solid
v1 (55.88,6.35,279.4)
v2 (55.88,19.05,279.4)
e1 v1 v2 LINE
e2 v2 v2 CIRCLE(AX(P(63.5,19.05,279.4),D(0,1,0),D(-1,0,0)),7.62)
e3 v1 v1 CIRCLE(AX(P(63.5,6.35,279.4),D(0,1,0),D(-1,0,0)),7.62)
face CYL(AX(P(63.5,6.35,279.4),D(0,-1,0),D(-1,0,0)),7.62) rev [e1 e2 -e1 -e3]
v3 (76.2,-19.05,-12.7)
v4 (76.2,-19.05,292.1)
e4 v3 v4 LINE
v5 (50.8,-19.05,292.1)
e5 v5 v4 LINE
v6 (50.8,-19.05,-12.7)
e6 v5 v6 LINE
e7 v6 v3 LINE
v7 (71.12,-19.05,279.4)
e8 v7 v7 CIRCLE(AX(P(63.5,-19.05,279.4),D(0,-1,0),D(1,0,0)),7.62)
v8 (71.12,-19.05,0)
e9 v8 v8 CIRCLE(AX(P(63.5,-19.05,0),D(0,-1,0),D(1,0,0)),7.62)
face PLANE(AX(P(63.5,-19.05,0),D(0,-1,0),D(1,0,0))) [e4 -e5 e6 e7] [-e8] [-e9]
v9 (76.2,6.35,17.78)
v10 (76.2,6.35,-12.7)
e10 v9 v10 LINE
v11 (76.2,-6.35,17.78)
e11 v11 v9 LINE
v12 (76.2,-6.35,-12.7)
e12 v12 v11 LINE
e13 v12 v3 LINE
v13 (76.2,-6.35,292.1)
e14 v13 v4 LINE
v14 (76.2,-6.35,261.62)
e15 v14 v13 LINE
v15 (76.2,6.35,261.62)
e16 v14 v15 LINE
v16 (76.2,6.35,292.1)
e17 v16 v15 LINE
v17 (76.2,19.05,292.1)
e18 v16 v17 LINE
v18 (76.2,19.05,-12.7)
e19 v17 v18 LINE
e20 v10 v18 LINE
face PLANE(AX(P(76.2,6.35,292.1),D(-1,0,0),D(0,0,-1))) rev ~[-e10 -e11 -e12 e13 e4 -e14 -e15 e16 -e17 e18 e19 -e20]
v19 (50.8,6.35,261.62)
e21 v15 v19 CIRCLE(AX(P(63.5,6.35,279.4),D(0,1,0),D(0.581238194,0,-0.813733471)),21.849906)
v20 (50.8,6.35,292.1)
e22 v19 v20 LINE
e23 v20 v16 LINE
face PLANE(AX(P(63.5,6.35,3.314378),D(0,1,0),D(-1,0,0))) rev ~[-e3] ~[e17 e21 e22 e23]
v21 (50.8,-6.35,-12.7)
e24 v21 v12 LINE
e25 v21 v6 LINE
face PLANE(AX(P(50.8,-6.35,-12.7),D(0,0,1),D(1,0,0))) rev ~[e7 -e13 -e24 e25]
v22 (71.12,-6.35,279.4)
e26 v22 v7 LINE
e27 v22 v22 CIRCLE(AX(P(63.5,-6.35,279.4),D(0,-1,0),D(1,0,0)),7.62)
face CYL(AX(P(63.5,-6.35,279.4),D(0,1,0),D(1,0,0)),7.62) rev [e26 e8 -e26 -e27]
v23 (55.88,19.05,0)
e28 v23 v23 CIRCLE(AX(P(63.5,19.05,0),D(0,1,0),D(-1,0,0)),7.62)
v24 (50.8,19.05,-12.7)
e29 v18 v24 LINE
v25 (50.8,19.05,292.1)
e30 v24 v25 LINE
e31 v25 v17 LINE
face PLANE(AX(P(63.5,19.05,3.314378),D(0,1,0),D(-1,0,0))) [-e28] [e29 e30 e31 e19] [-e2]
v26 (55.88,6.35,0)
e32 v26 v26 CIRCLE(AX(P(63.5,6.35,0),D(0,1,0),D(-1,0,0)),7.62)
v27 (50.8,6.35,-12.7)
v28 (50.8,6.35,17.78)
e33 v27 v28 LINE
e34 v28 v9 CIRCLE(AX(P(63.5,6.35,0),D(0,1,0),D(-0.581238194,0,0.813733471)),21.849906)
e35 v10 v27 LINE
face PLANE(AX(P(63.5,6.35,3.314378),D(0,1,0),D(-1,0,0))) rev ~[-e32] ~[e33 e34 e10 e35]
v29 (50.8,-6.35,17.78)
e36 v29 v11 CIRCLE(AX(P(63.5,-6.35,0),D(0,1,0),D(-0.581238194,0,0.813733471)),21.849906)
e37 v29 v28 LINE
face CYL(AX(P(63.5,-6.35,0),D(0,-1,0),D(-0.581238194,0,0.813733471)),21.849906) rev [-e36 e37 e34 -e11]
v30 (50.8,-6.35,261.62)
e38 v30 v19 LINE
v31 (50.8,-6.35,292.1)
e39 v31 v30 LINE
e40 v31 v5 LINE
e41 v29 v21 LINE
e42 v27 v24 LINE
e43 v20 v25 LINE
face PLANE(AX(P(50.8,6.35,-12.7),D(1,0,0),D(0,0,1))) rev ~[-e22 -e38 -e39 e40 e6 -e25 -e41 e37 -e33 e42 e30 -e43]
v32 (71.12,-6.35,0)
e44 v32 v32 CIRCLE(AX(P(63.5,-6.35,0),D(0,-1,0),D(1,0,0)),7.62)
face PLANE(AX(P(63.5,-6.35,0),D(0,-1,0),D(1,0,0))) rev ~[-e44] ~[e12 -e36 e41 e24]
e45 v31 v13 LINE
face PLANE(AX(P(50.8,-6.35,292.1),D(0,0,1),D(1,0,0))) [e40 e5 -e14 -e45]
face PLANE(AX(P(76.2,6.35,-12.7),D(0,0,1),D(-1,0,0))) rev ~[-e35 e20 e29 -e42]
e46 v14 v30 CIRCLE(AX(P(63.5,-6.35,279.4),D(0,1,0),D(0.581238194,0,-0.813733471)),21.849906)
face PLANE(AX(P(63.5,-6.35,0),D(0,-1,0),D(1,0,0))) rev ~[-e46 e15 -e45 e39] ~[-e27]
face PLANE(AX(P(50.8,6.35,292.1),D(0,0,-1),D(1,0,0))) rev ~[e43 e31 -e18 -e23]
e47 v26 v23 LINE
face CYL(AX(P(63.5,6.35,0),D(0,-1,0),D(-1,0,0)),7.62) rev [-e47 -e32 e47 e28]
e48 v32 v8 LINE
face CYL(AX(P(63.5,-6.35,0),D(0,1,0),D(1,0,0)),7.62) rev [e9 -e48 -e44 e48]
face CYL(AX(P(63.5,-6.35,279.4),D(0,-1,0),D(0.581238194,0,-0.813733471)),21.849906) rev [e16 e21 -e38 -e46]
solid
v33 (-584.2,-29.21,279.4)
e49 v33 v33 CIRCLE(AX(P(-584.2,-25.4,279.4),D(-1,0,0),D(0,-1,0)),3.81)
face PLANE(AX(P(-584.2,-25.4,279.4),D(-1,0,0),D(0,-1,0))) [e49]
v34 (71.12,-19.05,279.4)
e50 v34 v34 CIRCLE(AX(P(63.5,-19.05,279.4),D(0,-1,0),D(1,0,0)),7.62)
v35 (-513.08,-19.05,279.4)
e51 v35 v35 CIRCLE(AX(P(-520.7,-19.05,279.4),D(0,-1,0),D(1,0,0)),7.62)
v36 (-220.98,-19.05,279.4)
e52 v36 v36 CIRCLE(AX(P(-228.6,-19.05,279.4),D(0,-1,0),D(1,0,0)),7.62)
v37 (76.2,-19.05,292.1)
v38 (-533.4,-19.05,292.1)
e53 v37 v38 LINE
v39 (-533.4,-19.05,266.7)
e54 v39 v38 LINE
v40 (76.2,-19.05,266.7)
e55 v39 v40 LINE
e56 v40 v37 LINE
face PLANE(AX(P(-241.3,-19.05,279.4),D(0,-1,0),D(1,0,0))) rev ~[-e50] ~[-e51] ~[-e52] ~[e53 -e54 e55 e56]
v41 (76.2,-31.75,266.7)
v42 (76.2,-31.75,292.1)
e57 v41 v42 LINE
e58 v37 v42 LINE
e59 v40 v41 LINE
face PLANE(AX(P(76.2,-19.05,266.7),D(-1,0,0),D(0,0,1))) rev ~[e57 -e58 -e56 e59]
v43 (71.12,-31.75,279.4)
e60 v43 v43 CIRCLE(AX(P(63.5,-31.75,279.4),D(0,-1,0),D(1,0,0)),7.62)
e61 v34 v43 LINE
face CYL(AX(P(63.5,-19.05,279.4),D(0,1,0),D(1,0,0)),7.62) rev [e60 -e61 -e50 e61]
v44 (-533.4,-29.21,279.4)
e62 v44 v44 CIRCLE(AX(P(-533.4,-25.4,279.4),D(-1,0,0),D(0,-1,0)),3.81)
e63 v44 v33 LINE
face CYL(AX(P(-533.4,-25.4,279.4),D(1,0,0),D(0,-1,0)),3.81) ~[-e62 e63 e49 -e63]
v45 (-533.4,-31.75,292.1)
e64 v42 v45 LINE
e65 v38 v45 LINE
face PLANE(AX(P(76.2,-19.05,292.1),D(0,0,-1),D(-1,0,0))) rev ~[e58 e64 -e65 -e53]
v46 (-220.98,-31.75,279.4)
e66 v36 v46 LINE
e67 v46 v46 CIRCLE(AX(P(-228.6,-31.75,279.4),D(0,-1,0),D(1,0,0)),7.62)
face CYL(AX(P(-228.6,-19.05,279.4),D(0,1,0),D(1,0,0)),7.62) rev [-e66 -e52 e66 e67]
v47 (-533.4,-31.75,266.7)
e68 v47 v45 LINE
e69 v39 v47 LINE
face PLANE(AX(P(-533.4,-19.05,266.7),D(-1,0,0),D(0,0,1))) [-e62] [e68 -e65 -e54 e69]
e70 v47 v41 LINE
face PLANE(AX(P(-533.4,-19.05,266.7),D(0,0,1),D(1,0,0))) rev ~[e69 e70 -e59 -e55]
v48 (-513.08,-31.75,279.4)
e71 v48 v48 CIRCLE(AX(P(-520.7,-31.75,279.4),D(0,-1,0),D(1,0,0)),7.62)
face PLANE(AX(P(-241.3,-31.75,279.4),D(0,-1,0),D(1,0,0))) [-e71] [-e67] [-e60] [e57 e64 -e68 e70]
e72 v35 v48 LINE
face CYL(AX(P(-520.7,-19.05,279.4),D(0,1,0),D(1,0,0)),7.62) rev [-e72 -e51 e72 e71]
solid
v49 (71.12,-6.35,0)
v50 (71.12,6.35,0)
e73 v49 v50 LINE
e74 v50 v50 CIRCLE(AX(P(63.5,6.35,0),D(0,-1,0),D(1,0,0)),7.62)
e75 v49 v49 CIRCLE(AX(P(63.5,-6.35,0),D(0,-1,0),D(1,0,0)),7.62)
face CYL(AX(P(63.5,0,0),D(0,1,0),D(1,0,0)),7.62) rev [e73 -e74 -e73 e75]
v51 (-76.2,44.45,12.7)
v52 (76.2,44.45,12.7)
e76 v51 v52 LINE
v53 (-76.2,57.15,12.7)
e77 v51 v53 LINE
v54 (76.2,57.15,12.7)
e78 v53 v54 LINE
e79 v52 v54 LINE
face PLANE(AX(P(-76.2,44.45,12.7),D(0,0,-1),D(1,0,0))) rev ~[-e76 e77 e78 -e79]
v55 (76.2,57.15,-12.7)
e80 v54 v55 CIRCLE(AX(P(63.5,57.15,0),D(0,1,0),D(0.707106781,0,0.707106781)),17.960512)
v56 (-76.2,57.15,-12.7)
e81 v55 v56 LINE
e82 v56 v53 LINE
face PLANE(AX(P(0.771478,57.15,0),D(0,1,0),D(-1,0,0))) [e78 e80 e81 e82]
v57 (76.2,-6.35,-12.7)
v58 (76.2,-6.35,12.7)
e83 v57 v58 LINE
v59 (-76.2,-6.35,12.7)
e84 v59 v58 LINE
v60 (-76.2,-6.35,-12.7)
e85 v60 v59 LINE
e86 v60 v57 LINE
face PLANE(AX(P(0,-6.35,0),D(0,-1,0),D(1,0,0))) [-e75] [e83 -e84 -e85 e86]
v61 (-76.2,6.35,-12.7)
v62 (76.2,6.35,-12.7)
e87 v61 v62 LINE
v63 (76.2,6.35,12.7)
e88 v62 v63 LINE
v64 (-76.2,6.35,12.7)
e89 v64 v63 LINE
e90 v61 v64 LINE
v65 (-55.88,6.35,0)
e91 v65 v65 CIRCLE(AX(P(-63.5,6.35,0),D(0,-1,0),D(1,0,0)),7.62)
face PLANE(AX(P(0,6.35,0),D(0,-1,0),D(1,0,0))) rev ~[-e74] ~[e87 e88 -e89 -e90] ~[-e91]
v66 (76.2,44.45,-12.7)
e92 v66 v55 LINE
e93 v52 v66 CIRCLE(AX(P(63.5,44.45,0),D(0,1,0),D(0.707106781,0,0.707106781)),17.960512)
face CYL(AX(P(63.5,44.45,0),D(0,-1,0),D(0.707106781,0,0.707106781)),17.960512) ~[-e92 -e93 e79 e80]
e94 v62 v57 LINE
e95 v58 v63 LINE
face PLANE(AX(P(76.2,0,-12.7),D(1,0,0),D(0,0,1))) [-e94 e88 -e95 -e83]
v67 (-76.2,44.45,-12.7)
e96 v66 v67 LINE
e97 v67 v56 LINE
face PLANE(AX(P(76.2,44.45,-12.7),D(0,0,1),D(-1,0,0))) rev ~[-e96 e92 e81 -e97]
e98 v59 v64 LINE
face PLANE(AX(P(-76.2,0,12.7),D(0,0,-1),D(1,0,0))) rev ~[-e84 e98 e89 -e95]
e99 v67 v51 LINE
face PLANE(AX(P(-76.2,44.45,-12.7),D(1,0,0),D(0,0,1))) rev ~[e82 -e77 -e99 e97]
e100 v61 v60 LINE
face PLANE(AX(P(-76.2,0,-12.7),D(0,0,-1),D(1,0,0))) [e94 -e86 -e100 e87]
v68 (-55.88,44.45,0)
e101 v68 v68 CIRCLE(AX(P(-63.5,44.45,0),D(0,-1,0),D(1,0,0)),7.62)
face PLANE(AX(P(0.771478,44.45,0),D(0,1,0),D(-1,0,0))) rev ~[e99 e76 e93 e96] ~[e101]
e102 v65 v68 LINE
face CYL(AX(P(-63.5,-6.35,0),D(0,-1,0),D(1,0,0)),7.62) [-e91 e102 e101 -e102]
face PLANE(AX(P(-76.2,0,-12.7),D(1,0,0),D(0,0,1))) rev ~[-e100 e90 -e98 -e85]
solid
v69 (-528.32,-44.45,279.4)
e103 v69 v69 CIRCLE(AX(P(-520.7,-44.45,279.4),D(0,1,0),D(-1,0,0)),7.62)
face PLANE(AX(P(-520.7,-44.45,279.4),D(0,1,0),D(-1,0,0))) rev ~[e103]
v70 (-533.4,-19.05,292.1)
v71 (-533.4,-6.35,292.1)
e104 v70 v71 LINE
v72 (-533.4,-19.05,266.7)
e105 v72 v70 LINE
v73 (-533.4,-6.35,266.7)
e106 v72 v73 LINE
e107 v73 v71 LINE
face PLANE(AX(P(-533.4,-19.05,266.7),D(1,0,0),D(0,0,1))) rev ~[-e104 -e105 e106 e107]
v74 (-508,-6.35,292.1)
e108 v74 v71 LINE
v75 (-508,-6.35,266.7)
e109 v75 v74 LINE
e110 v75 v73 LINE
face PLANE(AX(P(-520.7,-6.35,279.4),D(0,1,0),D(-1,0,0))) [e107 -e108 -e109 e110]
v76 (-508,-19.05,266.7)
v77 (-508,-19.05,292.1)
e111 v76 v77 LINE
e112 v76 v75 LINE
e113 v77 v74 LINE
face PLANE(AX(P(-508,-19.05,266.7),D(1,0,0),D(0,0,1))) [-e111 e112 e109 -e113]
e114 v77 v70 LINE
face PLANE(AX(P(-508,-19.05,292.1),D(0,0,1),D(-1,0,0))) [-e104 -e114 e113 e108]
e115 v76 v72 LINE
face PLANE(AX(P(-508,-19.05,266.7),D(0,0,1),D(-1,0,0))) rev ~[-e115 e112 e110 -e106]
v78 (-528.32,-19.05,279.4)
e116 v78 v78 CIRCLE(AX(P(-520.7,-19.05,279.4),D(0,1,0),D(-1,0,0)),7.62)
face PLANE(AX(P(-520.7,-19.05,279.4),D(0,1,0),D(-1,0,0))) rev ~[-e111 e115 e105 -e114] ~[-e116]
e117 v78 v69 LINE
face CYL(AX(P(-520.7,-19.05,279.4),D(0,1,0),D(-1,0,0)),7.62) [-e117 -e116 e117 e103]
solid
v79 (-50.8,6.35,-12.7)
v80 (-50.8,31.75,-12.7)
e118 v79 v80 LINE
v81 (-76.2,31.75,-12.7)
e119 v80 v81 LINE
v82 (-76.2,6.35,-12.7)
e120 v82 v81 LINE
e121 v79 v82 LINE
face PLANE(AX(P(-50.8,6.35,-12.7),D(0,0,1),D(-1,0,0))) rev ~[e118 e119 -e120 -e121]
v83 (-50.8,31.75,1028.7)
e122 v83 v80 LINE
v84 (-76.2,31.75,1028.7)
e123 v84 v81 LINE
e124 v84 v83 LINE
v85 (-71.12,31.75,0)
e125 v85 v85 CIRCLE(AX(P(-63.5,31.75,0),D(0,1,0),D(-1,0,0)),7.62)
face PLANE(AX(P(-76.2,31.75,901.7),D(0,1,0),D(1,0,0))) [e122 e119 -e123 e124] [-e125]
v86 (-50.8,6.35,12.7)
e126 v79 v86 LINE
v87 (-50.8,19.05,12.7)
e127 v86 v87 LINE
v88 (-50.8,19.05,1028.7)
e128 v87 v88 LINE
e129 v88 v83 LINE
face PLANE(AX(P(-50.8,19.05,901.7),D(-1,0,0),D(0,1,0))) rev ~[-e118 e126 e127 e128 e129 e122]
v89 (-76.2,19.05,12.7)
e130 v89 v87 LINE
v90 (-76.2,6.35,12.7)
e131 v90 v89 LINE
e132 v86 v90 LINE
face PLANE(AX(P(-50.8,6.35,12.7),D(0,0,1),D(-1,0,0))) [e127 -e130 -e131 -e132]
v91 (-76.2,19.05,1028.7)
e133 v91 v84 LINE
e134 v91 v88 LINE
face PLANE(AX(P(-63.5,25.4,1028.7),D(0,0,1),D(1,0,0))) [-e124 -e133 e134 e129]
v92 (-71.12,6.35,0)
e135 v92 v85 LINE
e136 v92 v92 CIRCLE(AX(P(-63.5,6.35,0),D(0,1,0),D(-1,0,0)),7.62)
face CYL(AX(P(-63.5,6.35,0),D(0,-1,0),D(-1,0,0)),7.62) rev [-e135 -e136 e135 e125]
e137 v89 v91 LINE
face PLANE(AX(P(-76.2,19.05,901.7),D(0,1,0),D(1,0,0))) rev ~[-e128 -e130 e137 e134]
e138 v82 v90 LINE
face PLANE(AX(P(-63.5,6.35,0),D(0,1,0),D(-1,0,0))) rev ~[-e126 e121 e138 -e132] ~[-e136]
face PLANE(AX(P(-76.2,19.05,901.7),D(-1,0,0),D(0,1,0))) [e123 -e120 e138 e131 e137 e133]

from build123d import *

# Parameters (mm, degrees)
F0_W      = 152.4
F0_H      = 25.4
F0_R      = 7.62
F1_DEPTH  = 6.35
F2_W      = 25.4
F2_H      = 25.4
F2_R      = 7.62
F2_H_2    = 279.4
F3_DEPTH  = 12.7
F5_DEPTH  = 12.7
F6_R      = 7.62
F7_DEPTH  = 12.7
F8_W      = 584.2
F8_H      = 25.4
F8_R      = 7.62
F8_W_2    = 25.4
F9_DEPTH  = 12.7
F10_W     = 25.4
F10_H     = 25.4
F10_R     = 7.62
F11_DEPTH = 25.4
F12_DEPTH = 25.4
F13_W     = 25.4
F13_H     = 12.7
F14_DEPTH = 889
F15_W     = 25.4
F15_H     = 25.4
F15_R     = 7.62
F16_DEPTH = 12.7
F17_DEPTH = 25.4
F18_DEPTH = 127
F19_R     = 3.81
F20_DEPTH = 50.8
F21_DEPTH = 65.024
F22_R     = 7.62
F23_DEPTH = 50.8
F24_R     = 7.62
F25_DEPTH = 12.7


with BuildPart() as f1:
    # F0 (on Front) → F1 (new body, symmetric)
    with BuildSketch(Plane.XZ):
        Rectangle(F0_W, F0_H)
        with Locations((-63.5, 0)):
            Circle(F0_R, mode=Mode.SUBTRACT)
        with Locations((63.5, 0)):
            Circle(F0_R, mode=Mode.SUBTRACT)
    extrude(amount=F1_DEPTH, both=True)

    # F22 (on face) → F23 (join)
    with BuildSketch(Plane.XZ.offset(6.35)):
        with Locations((-63.5, 0)):
            Circle(F22_R)
    extrude(amount=-F23_DEPTH)

    # F24 (on face) → F25 (join)
    with BuildSketch(Plane(origin=(0, 44.45, 0), x_dir=(-1, 0, 0), z_dir=(0, 1, 0))):
        with BuildLine():
            Line((76.2, 12.7), (-76.2, 12.7))
            ThreePointArc((-76.2, 12.7), (-81.4605122421, 0), (-76.2, -12.7))
            Line((-76.2, -12.7), (76.2, -12.7))
            Line((76.2, -12.7), (76.2, 12.7))
        make_face()
        with Locations((63.5, 0)):
            Circle(F24_R, mode=Mode.SUBTRACT)
        with Locations((63.5, 0)):
            Circle(F24_R)
    extrude(amount=F25_DEPTH)


with BuildPart() as f3:
    # F2 (on face) → F3 (new body)
    with BuildSketch(Plane.XZ.offset(6.35)):
        with Locations((63.5, 0)):
            Rectangle(F2_W, F2_H)
        with Locations((63.5, 0)):
            Circle(F2_R, mode=Mode.SUBTRACT)
        with Locations((63.5, 152.4)):
            Rectangle(F2_W, F2_H_2)
        with Locations((63.5, 279.4)):
            Circle(F2_R, mode=Mode.SUBTRACT)
    extrude(amount=F3_DEPTH)

    # F4 (on face) → F5 (join, through all)
    with BuildSketch(Plane.XZ.offset(6.35)):
        with BuildLine():
            Line((50.8, 261.62), (50.8, 17.78))
            ThreePointArc((50.8, 17.78), (63.5, 21.8499061783), (76.2, 17.78))
            Line((76.2, 17.78), (76.2, 261.62))
            ThreePointArc((76.2, 261.62), (63.5, 257.5500938217), (50.8, 261.62))
        make_face()
    extrude(amount=-F5_DEPTH)

    # F6 (on face) → F7 (join)
    with BuildSketch(Plane(origin=(0, 6.35, 0), x_dir=(-1, 0, 0), z_dir=(0, 1, 0))):
        with BuildLine():
            Line((-76.2, -12.7), (-50.8, -12.7))
            Line((-50.8, -12.7), (-50.8, 17.78))
            ThreePointArc((-50.8, 17.78), (-63.5, 21.8499061783), (-76.2, 17.78))
            Line((-76.2, 17.78), (-76.2, -12.7))
        make_face()
        with Locations((-63.5, 0)):
            Circle(F6_R, mode=Mode.SUBTRACT)
        with BuildLine():
            ThreePointArc((-76.2, 17.78), (-63.5, 21.8499061783), (-50.8, 17.78))
            Line((-50.8, 17.78), (-50.8, 261.62))
            ThreePointArc((-50.8, 261.62), (-63.5, 257.5500938217), (-76.2, 261.62))
            Line((-76.2, 261.62), (-76.2, 17.78))
        make_face()
        with BuildLine():
            ThreePointArc((-76.2, 261.62), (-63.5, 257.5500938217), (-50.8, 261.62))
            Line((-50.8, 261.62), (-50.8, 292.1))
            Line((-50.8, 292.1), (-76.2, 292.1))
            Line((-76.2, 292.1), (-76.2, 261.62))
        make_face()
        with Locations((-63.5, 279.4)):
            Circle(F6_R, mode=Mode.SUBTRACT)
    extrude(amount=F7_DEPTH)


with BuildPart() as f9:
    # F8 (on face) → F9 (new body)
    with BuildSketch(Plane.XZ.offset(19.05)):
        with Locations((-241.3, 279.4)):
            Rectangle(F8_W, F8_H)
        with Locations((-520.7, 279.4)):
            Circle(F8_R, mode=Mode.SUBTRACT)
        with Locations((-228.6, 279.4)):
            Circle(F8_R, mode=Mode.SUBTRACT)
        with Locations((63.5, 279.4)):
            Rectangle(F8_W_2, F8_H)
        with Locations((63.5, 279.4)):
            Circle(F8_R, mode=Mode.SUBTRACT)
    extrude(amount=F9_DEPTH)

    # F19 (on face) → F20 (join)
    with BuildSketch(Plane(origin=(-533.4, 0, 0), x_dir=(0, -1, 0), z_dir=(-1, 0, 0))):
        with Locations((25.4, 279.4)):
            Circle(F19_R)
    extrude(amount=F20_DEPTH)


with BuildPart() as f11:
    # F10 (on face) → F11 (new body)
    with BuildSketch(Plane(origin=(0, 6.35, 0), x_dir=(-1, 0, 0), z_dir=(0, 1, 0))):
        with Locations((63.5, 0)):
            Rectangle(F10_W, F10_H)
        with Locations((63.5, 0)):
            Circle(F10_R, mode=Mode.SUBTRACT)
    extrude(amount=-F11_DEPTH)

    # F21 (cut): a face of the model
    f21_faces = [f11.faces().sort_by_distance(p)[0] for p in [
        (-75.8407897552, -19.05, 0),
    ]]
    extrude(f21_faces, amount=-F21_DEPTH, mode=Mode.SUBTRACT)


with BuildPart() as f12:
    # F10 (on face) → F12 (new body)
    with BuildSketch(Plane(origin=(0, 6.35, 0), x_dir=(-1, 0, 0), z_dir=(0, 1, 0))):
        with Locations((63.5, 0)):
            Rectangle(F10_W, F10_H)
        with Locations((63.5, 0)):
            Circle(F10_R, mode=Mode.SUBTRACT)
    extrude(amount=F12_DEPTH)

    # F13 (on face) → F14 (join)
    with BuildSketch(Plane.XY.offset(12.7)):
        with Locations((-63.5, 25.4)):
            Rectangle(F13_W, F13_H)
    extrude(amount=F14_DEPTH)

    # F18 (add): a face of the model
    f18_faces = [f12.faces().sort_by_distance(p)[0] for p in [
        (-63.5, 25.4, 901.7),
    ]]
    extrude(f18_faces, amount=F18_DEPTH)


with BuildPart() as f16:
    # F15 (on face) → F16 (new body)
    with BuildSketch(Plane(origin=(0, -19.05, 0), x_dir=(-1, 0, 0), z_dir=(0, 1, 0))):
        with Locations((520.7, 279.4)):
            Rectangle(F15_W, F15_H)
        with Locations((520.7, 279.4)):
            Circle(F15_R, mode=Mode.SUBTRACT)
        with Locations((520.7, 279.4)):
            Circle(F15_R)
    extrude(amount=F16_DEPTH)

    # F15 (on face) → F17 (join)
    with BuildSketch(Plane(origin=(0, -19.05, 0), x_dir=(-1, 0, 0), z_dir=(0, 1, 0))):
        with Locations((520.7, 279.4)):
            Circle(F15_R)
    extrude(amount=-F17_DEPTH)


solid = Compound([f1.part, f3.part, f9.part, f12.part, f16.part])
